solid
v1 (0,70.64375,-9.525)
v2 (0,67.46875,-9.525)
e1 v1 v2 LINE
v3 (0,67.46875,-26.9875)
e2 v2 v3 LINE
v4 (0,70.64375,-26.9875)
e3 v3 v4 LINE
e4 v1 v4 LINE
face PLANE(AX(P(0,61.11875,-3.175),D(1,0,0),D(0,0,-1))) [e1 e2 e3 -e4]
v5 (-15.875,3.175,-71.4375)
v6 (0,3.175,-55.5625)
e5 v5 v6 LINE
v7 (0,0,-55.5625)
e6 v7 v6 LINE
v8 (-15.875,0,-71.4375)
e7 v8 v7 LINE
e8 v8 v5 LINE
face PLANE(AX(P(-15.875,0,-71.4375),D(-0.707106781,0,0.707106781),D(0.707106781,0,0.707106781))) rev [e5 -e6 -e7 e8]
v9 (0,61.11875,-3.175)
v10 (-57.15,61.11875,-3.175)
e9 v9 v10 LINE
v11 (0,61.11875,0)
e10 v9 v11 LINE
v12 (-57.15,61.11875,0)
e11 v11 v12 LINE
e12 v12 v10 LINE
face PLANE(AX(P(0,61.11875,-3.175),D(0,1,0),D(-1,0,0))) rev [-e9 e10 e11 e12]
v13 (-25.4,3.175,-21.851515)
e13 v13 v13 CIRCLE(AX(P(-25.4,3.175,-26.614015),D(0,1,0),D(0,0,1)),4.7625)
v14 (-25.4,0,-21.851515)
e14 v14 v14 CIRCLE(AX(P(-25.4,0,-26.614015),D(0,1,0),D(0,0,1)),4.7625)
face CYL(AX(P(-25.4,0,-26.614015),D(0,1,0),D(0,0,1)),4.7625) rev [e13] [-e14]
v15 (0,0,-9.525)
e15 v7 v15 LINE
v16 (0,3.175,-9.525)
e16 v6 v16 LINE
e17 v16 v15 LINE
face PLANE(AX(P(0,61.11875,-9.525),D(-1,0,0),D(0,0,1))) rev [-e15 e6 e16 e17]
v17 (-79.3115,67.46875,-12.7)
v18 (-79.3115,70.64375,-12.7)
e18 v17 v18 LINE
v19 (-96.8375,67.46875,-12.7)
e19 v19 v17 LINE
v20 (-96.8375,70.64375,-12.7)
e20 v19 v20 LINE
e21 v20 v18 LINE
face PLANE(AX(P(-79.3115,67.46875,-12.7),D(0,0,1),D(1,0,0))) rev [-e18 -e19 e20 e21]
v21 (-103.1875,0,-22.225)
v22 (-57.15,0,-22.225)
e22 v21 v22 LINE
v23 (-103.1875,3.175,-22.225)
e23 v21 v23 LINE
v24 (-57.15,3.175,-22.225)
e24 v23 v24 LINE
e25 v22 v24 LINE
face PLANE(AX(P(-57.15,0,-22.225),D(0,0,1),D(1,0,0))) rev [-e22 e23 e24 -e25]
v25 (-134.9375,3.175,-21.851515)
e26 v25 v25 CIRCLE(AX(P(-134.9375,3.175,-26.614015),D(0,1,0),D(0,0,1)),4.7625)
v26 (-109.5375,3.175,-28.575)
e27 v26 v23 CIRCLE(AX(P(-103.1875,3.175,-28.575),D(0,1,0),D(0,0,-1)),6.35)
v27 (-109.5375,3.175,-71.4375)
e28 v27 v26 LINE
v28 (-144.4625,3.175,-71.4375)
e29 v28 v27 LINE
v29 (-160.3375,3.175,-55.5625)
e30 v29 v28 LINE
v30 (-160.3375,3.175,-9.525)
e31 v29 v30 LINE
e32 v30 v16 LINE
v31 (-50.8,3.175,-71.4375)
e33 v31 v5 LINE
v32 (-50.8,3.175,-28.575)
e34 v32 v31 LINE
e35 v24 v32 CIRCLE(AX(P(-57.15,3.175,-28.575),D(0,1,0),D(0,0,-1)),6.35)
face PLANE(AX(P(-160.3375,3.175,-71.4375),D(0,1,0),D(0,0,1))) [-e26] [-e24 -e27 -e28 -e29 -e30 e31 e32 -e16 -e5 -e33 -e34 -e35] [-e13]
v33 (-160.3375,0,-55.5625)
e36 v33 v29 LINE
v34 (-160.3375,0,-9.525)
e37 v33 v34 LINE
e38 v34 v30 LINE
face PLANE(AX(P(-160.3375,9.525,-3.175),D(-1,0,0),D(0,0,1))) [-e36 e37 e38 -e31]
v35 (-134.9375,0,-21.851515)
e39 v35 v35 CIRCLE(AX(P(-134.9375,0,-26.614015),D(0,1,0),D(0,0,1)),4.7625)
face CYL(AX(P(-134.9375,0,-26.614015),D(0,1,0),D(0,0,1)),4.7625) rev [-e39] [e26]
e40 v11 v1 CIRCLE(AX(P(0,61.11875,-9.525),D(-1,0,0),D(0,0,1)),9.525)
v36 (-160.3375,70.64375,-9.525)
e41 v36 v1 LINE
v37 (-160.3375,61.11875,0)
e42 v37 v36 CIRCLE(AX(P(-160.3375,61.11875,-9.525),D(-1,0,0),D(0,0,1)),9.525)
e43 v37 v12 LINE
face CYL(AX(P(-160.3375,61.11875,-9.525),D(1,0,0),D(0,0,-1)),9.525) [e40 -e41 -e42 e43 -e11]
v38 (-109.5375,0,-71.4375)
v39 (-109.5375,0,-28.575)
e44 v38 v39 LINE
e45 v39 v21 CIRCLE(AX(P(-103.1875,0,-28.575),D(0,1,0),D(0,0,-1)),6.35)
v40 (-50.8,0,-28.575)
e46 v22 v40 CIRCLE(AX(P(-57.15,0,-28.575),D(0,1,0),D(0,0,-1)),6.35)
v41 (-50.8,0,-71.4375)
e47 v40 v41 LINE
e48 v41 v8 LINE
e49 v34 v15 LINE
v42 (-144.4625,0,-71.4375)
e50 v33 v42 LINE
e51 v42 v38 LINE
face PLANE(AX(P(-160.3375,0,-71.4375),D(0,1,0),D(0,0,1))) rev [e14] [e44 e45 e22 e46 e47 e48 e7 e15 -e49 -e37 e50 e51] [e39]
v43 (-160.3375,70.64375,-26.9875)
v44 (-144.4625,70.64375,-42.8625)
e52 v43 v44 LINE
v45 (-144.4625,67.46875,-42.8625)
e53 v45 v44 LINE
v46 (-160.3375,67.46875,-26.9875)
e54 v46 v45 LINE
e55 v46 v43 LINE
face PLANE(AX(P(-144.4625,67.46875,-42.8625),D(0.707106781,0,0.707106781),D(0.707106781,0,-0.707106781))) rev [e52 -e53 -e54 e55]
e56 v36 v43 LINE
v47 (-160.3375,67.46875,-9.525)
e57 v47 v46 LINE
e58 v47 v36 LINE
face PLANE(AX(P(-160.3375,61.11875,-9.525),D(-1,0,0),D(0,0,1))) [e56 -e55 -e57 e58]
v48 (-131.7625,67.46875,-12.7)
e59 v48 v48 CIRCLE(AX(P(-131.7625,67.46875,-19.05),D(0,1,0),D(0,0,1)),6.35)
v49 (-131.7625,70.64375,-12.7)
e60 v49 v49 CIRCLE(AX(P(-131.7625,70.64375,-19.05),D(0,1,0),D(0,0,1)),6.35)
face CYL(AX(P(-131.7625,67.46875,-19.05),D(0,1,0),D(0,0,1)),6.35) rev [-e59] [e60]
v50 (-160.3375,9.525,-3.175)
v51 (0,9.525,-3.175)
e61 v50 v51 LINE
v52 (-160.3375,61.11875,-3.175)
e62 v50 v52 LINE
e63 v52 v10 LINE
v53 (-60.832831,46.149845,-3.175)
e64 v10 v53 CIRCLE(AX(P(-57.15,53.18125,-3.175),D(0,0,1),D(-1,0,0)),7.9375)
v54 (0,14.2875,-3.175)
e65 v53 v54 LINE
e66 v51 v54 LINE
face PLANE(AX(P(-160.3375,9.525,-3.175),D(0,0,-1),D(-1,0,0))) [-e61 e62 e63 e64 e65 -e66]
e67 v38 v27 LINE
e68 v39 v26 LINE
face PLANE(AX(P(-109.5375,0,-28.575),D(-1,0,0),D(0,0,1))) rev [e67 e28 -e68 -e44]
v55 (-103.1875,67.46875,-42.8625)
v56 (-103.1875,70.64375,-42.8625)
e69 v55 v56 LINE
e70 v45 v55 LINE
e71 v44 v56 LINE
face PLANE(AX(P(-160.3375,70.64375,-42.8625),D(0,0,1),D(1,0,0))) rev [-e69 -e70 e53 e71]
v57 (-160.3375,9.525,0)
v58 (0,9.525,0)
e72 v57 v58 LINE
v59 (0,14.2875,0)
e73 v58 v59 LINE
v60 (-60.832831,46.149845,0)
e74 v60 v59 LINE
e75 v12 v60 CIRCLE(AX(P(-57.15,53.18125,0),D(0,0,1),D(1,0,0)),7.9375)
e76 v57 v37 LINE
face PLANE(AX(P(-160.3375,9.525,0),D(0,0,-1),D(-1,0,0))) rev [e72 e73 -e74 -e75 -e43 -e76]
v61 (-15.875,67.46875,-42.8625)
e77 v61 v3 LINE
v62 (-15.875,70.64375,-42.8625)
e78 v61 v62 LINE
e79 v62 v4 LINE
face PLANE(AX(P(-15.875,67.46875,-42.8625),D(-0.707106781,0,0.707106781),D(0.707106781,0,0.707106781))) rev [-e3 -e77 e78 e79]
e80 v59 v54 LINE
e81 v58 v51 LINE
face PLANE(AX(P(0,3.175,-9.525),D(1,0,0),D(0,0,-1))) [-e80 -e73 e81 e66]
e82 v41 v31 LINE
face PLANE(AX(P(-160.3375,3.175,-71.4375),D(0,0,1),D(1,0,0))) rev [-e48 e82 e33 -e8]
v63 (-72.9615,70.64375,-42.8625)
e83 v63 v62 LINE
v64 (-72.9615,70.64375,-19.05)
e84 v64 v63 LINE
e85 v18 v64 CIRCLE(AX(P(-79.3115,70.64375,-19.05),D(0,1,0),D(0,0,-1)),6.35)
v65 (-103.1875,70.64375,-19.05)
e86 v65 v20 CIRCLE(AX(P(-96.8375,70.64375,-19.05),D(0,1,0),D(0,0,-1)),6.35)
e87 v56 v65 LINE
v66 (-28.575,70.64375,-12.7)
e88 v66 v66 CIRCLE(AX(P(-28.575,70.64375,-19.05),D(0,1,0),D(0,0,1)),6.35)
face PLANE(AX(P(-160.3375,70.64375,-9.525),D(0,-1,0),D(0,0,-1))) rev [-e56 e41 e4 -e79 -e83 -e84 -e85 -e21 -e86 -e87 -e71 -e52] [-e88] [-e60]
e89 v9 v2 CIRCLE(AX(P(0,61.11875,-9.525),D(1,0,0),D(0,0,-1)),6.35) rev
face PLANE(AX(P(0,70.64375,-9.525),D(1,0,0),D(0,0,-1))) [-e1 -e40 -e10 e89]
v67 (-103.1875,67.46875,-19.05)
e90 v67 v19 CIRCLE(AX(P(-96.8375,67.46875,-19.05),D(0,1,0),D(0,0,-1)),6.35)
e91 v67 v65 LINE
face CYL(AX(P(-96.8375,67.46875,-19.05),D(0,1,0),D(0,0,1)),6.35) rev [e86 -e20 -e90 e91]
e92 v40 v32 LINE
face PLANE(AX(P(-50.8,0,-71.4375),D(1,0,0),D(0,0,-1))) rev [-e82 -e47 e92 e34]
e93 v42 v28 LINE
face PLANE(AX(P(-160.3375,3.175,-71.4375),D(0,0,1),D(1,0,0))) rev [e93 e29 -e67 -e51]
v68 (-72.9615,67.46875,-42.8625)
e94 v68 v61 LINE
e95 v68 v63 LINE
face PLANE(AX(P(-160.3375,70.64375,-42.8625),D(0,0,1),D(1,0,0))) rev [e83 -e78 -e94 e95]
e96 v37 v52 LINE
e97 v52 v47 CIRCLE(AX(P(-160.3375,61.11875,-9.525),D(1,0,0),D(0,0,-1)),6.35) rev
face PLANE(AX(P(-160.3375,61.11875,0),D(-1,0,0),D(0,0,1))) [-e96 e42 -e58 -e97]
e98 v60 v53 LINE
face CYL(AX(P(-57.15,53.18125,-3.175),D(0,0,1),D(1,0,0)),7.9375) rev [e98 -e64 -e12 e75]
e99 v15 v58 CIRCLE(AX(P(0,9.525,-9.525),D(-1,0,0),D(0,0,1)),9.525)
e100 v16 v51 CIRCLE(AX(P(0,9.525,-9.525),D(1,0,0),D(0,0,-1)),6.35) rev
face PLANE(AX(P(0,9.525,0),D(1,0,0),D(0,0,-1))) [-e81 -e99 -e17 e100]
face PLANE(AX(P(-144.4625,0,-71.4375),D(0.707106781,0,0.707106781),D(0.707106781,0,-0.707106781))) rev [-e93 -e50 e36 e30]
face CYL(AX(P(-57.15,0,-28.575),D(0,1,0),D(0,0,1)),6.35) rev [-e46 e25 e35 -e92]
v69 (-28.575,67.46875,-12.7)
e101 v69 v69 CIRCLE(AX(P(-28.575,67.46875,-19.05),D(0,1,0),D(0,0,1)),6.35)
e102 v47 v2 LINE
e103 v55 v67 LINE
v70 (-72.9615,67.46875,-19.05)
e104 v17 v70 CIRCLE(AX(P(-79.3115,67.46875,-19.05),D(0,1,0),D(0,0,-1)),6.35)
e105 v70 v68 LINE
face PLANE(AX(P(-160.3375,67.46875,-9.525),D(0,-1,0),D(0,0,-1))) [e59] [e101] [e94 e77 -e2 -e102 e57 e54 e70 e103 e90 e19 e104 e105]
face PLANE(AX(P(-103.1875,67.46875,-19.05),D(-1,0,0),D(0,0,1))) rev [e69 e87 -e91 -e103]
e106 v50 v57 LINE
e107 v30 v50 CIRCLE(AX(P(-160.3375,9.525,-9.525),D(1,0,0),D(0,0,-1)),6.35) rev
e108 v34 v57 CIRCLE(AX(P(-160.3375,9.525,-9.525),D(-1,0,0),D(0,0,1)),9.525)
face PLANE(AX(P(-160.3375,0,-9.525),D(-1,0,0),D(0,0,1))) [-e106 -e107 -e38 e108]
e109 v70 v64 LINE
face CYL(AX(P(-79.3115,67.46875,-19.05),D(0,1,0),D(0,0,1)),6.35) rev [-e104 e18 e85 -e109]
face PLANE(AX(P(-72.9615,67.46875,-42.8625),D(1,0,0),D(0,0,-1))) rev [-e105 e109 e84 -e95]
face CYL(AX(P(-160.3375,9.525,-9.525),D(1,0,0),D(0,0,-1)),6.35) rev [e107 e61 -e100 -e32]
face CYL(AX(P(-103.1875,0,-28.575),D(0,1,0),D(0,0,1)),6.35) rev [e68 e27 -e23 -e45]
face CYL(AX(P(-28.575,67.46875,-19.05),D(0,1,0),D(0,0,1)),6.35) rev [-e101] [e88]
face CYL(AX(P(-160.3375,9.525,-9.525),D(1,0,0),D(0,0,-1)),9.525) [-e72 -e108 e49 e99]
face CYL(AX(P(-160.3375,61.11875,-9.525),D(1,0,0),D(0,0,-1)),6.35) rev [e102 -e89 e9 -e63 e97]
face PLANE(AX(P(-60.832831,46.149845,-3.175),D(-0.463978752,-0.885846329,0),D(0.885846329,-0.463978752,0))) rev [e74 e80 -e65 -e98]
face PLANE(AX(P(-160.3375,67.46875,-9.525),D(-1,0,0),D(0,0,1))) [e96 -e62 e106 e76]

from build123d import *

# Parameters (mm, degrees)
BASE_FLANGE1_DEPTH = 160.3375
CUT_EXTRUDE1_DEPTH = 3.175
CUT_EXTRUDE2_DEPTH = 3.175
CUT_EXTRUDE3_DEPTH = 3.175
CUT_EXTRUDE4_DEPTH = 3.175
CUT_EXTRUDE5_DEPTH = 3.175
CUT_EXTRUDE6_DEPTH = 3.175
SKETCH12_R         = 6.35
CUT_EXTRUDE7_DEPTH = 3.175
SKETCH13_R         = 4.7625
CUT_EXTRUDE8_DEPTH = 3.175
CUT_EXTRUDE9_DEPTH = 3.175


# Sheet-metal steps are written as plain solids
with BuildPart() as part:
    # Sketch1 → Base-Flange1 (new body)
    with BuildSketch(Plane(origin=(0, 0, 0), x_dir=(0, 0, -1), z_dir=(1, 0, 0))):
        with BuildLine():
            Line((71.4375, 0), (9.525, 0))
            ThreePointArc((9.525, 0), (2.789807909, 2.789807909), (0, 9.525))
            Line((0, 9.525), (0, 61.11875))
            ThreePointArc((0, 61.11875), (2.789807909, 67.853942091), (9.525, 70.64375))
            Line((9.525, 70.64375), (42.8625, 70.64375))
            Line((42.8625, 70.64375), (42.8625, 67.46875))
            Line((42.8625, 67.46875), (9.525, 67.46875))
            ThreePointArc((9.525, 67.46875), (5.034871939, 65.608878061), (3.175, 61.11875))
            Line((3.175, 61.11875), (3.175, 9.525))
            ThreePointArc((3.175, 9.525), (5.034871939, 5.034871939), (9.525, 3.175))
            Line((9.525, 3.175), (71.4375, 3.175))
            Line((71.4375, 3.175), (71.4375, 0))
        make_face()
    extrude(amount=-BASE_FLANGE1_DEPTH)

    # Sketch6 → Cut-Extrude1 (cut)
    with BuildSketch(Plane(origin=(0, 3.175, 0), x_dir=(1, 0, 0), z_dir=(0, 1, 0))):
        with BuildLine():
            Line((-50.8, 71.4375), (-50.8, 28.575))
            ThreePointArc((-50.8, 28.575), (-52.659871939, 24.084871939), (-57.15, 22.225))
            Line((-57.15, 22.225), (-103.1875, 22.225))
            ThreePointArc((-103.1875, 22.225), (-107.677628061, 24.084871939), (-109.5375, 28.575))
            Line((-109.5375, 28.575), (-109.5375, 71.4375))
            Line((-109.5375, 71.4375), (-50.8, 71.4375))
        make_face()
    extrude(amount=-CUT_EXTRUDE1_DEPTH, mode=Mode.SUBTRACT)

    # Sketch7 → Cut-Extrude2 (cut)
    with BuildSketch(Plane(origin=(0, 3.175, 0), x_dir=(1, 0, 0), z_dir=(0, 1, 0))):
        Polygon((0, 71.4375), (-15.875, 71.4375), (0, 55.5625), align=None)
    extrude(amount=-CUT_EXTRUDE2_DEPTH, mode=Mode.SUBTRACT)

    # Sketch8 → Cut-Extrude3 (cut)
    with BuildSketch(Plane(origin=(0, 3.175, 0), x_dir=(1, 0, 0), z_dir=(0, 1, 0))):
        Polygon((-160.3375, 71.4375), (-144.4625, 71.4375), (-160.3375, 55.5625), align=None)
    extrude(amount=-CUT_EXTRUDE3_DEPTH, mode=Mode.SUBTRACT)

    # Sketch9 → Cut-Extrude4 (cut)
    with BuildSketch(Plane(origin=(0, 70.64375, 0), x_dir=(1, 0, 0), z_dir=(0, 1, 0))):
        Polygon((-160.3375, 42.8625), (-144.4625, 42.8625), (-160.3375, 26.9875), align=None)
    extrude(amount=-CUT_EXTRUDE4_DEPTH, mode=Mode.SUBTRACT)

    # Sketch10 → Cut-Extrude5 (cut)
    with BuildSketch(Plane(origin=(0, 70.64375, 0), x_dir=(1, 0, 0), z_dir=(0, 1, 0))):
        Polygon((0, 42.8625), (-15.875, 42.8625), (0, 26.9875), align=None)
    extrude(amount=-CUT_EXTRUDE5_DEPTH, mode=Mode.SUBTRACT)

    # Sketch11 → Cut-Extrude6 (cut)
    with BuildSketch(Plane.XY):
        with BuildLine():
            Line((0, 61.11875), (-57.15, 61.11875))
            ThreePointArc((-57.15, 61.11875), (-64.857648322, 55.07757898), (-60.83283134, 46.149844766))
            Line((-60.83283134, 46.149844766), (0, 14.2875))
            Line((0, 14.2875), (0, 61.11875))
        make_face()
    extrude(amount=-CUT_EXTRUDE6_DEPTH, mode=Mode.SUBTRACT)

    # Sketch12 → Cut-Extrude7 (cut)
    with BuildSketch(Plane(origin=(0, 70.64375, 0), x_dir=(1, 0, 0), z_dir=(0, 1, 0))):
        with Locations(Location((-28.575, 19.05, 0), (0, 0, 270))):
            Circle(SKETCH12_R)
        with Locations(Location((-131.7625, 19.05, 0), (0, 0, 270))):
            Circle(SKETCH12_R)
    extrude(amount=-CUT_EXTRUDE7_DEPTH, mode=Mode.SUBTRACT)

    # Sketch13 → Cut-Extrude8 (cut)
    with BuildSketch(Plane(origin=(0, 3.175, 0), x_dir=(1, 0, 0), z_dir=(0, 1, 0))):
        with Locations(Location((-25.4, 26.614015176, 0), (0, 0, 270))):
            Circle(SKETCH13_R)
        with Locations(Location((-134.9375, 26.614015176, 0), (0, 0, 270))):
            Circle(SKETCH13_R)
    extrude(amount=-CUT_EXTRUDE8_DEPTH, mode=Mode.SUBTRACT)

    # Sketch14 → Cut-Extrude9 (cut)
    with BuildSketch(Plane(origin=(0, 70.64375, 0), x_dir=(1, 0, 0), z_dir=(0, 1, 0))):
        with BuildLine():
            Line((-72.9615, 42.8625), (-72.9615, 19.05))
            ThreePointArc((-72.9615, 19.05), (-74.821371939, 14.559871939), (-79.3115, 12.7))
            Line((-79.3115, 12.7), (-96.8375, 12.7))
            ThreePointArc((-96.8375, 12.7), (-101.327628061, 14.559871939), (-103.1875, 19.05))
            Line((-103.1875, 19.05), (-103.1875, 42.8625))
            Line((-103.1875, 42.8625), (-72.9615, 42.8625))
        make_face()
    extrude(amount=-CUT_EXTRUDE9_DEPTH, mode=Mode.SUBTRACT)


solid = part.part
